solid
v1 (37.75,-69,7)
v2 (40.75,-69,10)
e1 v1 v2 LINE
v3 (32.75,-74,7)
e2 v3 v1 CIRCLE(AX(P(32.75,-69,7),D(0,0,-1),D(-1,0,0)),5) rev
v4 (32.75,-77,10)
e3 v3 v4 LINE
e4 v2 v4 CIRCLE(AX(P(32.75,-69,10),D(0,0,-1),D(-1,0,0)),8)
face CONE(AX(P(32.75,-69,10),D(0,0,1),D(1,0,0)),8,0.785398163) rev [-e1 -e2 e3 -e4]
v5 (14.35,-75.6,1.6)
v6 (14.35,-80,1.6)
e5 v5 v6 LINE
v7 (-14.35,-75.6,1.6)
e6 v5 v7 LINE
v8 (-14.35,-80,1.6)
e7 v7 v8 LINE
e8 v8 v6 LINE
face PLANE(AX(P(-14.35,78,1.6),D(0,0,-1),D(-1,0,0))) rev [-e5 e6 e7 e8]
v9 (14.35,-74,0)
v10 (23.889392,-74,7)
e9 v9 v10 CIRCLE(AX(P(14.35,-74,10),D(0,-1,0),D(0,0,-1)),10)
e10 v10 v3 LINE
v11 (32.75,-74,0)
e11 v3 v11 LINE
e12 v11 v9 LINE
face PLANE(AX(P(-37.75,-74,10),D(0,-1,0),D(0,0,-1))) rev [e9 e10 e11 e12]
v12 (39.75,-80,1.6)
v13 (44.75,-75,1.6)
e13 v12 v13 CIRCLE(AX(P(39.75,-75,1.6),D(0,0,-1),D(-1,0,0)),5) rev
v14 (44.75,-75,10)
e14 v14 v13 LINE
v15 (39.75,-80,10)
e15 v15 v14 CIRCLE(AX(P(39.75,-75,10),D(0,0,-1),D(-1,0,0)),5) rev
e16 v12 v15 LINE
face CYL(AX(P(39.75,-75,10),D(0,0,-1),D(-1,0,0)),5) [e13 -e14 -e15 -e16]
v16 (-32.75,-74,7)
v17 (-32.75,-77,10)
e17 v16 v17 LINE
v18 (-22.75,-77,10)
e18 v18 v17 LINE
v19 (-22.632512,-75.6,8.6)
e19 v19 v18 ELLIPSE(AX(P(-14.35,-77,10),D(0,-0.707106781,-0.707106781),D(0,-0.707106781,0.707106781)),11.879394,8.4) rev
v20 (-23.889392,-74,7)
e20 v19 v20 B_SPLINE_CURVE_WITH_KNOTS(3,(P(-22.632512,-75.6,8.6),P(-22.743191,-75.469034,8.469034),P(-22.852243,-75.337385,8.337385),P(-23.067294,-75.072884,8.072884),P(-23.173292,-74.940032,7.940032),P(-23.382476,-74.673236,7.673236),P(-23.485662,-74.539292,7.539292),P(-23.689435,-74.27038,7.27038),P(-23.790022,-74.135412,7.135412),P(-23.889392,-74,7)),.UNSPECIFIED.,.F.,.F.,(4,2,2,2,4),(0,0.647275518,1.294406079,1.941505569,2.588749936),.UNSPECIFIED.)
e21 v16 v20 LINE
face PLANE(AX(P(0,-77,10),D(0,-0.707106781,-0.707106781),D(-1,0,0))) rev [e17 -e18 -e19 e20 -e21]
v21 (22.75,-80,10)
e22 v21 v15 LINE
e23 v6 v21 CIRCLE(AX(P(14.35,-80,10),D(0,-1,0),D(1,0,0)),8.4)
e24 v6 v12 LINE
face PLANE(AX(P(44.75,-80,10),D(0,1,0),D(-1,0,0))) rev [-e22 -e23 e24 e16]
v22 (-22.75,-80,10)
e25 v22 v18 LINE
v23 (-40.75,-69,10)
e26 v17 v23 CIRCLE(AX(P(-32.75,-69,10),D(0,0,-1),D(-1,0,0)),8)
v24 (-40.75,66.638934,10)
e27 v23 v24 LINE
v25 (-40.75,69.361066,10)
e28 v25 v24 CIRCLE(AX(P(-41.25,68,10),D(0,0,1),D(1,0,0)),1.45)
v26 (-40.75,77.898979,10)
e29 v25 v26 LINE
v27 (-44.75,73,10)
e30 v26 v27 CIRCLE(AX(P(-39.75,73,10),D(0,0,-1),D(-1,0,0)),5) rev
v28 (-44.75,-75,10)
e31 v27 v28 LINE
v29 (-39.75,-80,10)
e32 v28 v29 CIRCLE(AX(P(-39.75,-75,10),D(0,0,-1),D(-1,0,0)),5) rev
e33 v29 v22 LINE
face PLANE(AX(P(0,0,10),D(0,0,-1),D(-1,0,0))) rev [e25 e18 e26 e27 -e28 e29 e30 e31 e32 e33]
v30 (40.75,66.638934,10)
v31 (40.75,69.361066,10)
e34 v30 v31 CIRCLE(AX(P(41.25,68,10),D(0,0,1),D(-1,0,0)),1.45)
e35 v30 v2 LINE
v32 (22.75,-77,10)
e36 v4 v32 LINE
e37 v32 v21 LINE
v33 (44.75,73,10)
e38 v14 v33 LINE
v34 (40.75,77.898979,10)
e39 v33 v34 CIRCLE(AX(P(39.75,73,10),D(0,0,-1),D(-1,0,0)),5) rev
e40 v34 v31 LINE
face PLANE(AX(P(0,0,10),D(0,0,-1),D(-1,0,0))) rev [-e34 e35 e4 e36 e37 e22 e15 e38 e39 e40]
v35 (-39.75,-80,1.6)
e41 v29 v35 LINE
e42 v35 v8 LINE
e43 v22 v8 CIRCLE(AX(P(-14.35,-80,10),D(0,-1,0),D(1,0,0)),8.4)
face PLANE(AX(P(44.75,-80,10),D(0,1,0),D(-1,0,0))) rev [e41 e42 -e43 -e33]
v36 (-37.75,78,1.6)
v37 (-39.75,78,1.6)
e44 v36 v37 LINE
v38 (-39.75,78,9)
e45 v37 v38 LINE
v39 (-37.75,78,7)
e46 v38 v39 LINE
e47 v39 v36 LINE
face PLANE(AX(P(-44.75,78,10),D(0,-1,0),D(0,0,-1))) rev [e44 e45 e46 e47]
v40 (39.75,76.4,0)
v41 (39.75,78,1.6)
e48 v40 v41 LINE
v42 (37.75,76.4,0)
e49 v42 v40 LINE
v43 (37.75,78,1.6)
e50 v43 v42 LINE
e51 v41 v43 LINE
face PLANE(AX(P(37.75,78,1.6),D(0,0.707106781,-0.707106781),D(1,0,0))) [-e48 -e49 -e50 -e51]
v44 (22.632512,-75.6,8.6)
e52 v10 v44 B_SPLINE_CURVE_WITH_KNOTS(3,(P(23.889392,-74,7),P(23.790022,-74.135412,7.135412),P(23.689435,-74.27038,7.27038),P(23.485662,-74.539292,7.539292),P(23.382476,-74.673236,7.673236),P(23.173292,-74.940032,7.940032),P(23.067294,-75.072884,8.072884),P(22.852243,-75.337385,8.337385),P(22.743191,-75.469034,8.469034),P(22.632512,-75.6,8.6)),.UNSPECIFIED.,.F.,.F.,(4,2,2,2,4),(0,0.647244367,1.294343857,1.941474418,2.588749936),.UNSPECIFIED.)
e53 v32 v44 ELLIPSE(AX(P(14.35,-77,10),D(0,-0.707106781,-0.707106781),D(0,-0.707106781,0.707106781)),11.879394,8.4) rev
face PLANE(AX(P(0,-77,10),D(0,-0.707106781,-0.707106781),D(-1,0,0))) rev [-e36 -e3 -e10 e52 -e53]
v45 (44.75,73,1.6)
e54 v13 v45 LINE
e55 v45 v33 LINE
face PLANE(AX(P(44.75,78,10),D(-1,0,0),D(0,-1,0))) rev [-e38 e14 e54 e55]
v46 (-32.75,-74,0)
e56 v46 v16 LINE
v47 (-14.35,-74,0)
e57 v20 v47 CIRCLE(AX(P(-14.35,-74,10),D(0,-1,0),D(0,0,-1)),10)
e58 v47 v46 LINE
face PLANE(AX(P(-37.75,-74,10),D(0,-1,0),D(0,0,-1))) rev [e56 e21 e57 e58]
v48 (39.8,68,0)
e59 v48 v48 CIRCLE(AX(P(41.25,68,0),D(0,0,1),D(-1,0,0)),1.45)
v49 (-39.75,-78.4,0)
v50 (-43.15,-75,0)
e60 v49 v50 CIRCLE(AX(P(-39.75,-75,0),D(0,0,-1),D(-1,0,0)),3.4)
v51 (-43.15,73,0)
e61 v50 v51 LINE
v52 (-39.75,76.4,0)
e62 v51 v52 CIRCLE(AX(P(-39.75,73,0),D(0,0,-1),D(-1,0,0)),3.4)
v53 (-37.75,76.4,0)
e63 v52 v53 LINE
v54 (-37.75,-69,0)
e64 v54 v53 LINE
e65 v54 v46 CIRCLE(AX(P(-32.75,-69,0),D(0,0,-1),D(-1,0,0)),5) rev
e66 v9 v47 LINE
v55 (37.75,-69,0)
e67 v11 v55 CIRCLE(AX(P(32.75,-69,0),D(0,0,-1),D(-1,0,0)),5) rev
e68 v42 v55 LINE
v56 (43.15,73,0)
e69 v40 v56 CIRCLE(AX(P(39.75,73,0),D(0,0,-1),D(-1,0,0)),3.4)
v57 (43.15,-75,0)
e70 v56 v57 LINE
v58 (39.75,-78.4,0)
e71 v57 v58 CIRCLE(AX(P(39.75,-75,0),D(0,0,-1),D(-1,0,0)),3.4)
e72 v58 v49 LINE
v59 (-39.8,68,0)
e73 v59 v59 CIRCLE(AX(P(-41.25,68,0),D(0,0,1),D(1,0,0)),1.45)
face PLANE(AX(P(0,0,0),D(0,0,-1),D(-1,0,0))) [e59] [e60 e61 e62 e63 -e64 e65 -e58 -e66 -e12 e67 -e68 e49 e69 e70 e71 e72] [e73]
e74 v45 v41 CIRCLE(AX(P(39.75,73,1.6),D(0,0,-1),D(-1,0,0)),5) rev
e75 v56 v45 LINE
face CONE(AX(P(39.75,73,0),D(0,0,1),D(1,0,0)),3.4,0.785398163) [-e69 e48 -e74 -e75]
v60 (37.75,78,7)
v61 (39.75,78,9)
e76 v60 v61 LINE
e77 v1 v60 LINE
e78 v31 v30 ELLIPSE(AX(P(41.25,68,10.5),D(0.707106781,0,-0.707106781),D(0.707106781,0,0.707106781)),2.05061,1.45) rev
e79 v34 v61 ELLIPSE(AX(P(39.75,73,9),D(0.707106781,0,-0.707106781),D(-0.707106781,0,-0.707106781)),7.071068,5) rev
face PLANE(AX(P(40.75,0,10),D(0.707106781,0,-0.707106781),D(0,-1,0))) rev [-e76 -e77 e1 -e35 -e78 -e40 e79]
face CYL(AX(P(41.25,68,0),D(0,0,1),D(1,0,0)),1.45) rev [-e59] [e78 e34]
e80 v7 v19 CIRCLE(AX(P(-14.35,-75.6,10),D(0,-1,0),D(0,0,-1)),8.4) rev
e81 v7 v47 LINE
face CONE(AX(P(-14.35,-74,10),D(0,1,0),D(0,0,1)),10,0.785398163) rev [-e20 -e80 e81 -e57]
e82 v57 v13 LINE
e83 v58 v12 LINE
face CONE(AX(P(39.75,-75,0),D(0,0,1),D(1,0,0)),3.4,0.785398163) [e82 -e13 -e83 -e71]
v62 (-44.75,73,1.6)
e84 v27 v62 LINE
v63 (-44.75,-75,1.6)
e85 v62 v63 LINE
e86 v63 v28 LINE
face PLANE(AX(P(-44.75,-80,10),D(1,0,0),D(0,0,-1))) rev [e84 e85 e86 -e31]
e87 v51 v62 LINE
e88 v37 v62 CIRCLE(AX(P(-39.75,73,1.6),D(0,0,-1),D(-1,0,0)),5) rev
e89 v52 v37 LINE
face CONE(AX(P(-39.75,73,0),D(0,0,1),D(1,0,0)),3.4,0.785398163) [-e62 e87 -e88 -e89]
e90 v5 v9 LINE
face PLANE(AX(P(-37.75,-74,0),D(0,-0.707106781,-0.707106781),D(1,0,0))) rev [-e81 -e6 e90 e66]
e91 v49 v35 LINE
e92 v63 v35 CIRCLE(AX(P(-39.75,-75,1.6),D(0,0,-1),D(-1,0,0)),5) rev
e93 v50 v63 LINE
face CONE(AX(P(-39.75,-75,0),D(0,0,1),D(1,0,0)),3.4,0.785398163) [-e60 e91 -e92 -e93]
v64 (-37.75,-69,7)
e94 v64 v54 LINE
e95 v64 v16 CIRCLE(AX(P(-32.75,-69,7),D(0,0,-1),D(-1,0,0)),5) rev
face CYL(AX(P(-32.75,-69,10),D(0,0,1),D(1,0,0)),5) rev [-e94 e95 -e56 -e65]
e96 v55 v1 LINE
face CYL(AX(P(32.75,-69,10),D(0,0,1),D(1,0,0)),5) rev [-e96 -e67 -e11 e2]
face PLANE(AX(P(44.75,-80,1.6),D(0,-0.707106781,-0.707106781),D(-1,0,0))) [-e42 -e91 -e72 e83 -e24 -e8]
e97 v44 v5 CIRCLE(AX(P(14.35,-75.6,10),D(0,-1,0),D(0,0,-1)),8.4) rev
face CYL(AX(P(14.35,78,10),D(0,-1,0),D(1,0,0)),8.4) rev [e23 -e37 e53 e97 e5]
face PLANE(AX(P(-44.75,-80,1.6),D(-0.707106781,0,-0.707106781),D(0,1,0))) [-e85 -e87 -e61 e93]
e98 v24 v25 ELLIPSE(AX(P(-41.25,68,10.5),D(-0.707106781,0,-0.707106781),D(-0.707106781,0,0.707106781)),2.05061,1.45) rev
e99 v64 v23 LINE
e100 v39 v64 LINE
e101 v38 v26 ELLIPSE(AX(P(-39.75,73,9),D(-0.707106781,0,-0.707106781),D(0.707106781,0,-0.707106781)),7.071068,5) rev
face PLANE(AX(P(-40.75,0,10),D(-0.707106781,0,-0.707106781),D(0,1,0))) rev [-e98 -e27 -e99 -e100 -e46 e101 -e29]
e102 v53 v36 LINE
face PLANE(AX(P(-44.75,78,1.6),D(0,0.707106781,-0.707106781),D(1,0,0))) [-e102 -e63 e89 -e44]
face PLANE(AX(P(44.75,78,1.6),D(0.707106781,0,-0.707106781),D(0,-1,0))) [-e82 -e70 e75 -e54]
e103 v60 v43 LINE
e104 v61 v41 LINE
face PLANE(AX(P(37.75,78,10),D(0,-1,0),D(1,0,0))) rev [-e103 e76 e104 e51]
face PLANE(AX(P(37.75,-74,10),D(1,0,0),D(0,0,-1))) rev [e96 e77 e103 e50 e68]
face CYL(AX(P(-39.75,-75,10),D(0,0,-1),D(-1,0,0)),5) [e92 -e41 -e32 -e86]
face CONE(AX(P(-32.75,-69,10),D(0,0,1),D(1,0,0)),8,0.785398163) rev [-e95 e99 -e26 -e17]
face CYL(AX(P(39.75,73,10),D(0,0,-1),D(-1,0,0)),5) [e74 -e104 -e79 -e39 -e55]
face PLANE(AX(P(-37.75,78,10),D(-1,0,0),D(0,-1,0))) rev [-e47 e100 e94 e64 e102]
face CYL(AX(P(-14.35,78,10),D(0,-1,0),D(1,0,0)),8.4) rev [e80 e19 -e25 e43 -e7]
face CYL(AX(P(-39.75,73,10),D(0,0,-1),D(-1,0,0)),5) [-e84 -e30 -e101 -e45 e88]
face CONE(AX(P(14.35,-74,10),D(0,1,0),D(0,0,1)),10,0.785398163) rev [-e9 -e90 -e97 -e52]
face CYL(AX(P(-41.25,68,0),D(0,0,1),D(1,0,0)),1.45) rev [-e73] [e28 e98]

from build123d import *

# Parameters (mm, degrees)
BOSS_EXTRUDE1_DEPTH = 10
SKETCH4_R           = 1.45
CUT_EXTRUDE2_DEPTH  = 93.209340633
FILLET3_R           = 5
CHAMFER1_SIZE       = 3
FILLET1_R           = 5
FILLET2_R           = 5
CHAMFER2_SIZE       = 1.6
CUT_EXTRUDE1_DEPTH  = 165.519185811
CHAMFER3_SIZE       = 1.6


# Some blends are built 0.0001 mm under size
with BuildPart() as part:
    # Sketch2 → Boss-Extrude1 (new body)
    with BuildSketch(Plane.XY):
        Polygon((-44.75, 78), (-37.75, 78), (-37.75, -74), (37.75, -74), (37.75, 78), (44.75, 78), (44.75, -80), (-44.75, -80), align=None)
    extrude(amount=BOSS_EXTRUDE1_DEPTH)

    # Sketch4 → Cut-Extrude2 (cut, through all)
    with BuildSketch(Plane.XY.offset(10)):
        with Locations((-41.25, 68)):
            Circle(SKETCH4_R)
        with Locations(Location((41.25, 68, 0), (0, 0, 180))):
            Circle(SKETCH4_R)
    extrude(amount=-CUT_EXTRUDE2_DEPTH, mode=Mode.SUBTRACT)

    # Fillet3
    fillet3_edges = [part.edges().sort_by_distance(p)[0] for p in [
        (-37.75, -74, 5),
        (37.75, -74, 5),
    ]]
    fillet(fillet3_edges, radius=FILLET3_R)

    # Chamfer1
    # the kernel refuses this chamfer: 3 mm, written as the material it takes off along each edge
    with BuildSketch(Plane(origin=(37.75, -69, 10), x_dir=(0.9996219169112968, 0, 0.02749587661058619), z_dir=(0, 1, 0))) as chamfer1_piece_1:
        Polygon((CHAMFER1_SIZE * 0.999621916911, CHAMFER1_SIZE * 0.0274958766106), (-CHAMFER1_SIZE * 0.0274958766106, CHAMFER1_SIZE * 0.999621916911), (0, 0), align=None)
    extrude(amount=154.715048964, mode=Mode.SUBTRACT)
    with BuildSketch(Plane(origin=(-32.75, -74, 10), x_dir=(0, -0.9996219169112968, 0.02749587661058619), z_dir=(1, 0, 0))) as chamfer1_piece_2:
        Polygon((CHAMFER1_SIZE * 0.999621916911, CHAMFER1_SIZE * 0.0274958766106), (-CHAMFER1_SIZE * 0.0274958766106, CHAMFER1_SIZE * 0.999621916911), (0, 0), align=None)
    extrude(amount=65.5, mode=Mode.SUBTRACT)
    with BuildSketch(Plane(origin=(-37.75, 85.715048964, 10), x_dir=(0.027495876610586775, 0, -0.9996219169112968), z_dir=(0, -1, 0))) as chamfer1_piece_3:
        Polygon((CHAMFER1_SIZE * 0.999621916911, -CHAMFER1_SIZE * 0.0274958766106), (-CHAMFER1_SIZE * 0.0274958766106, -CHAMFER1_SIZE * 0.999621916911), (0, 0), align=None)
    extrude(amount=154.715048964, mode=Mode.SUBTRACT)
    with BuildSketch(Plane(origin=(32.75, -69, 10), x_dir=(0, -1, 0), z_dir=(-1, 0, 0))) as chamfer1_piece_4:
        Polygon((5 + CHAMFER1_SIZE, 0), (5, -CHAMFER1_SIZE), (5, 0), align=None)
    revolve(axis=Axis((32.75, -69, 10), (0, 0, 1)), revolution_arc=90, mode=Mode.SUBTRACT)
    with BuildSketch(Plane(origin=(-32.75, -69, 10), x_dir=(-1, 0, 0), z_dir=(0, 1, 0))) as chamfer1_piece_5:
        Polygon((5, -CHAMFER1_SIZE), (5 + CHAMFER1_SIZE, 0), (5, 0), align=None)
    revolve(axis=Axis((-32.75, -69, 10), (0, 0, 1)), revolution_arc=90, mode=Mode.SUBTRACT)

    # Fillet1
    fillet1_edges = [part.edges().sort_by_distance(p)[0] for p in [
        (44.75, 78, 5),
        (-44.75, 78, 5),
    ]]
    fillet(fillet1_edges, radius=FILLET1_R)

    # Fillet2
    fillet2_edges = [part.edges().sort_by_distance(p)[0] for p in [
        (44.75, -80, 5),
        (-44.75, -80, 5),
    ]]
    fillet(fillet2_edges, radius=FILLET2_R)

    # Chamfer2
    chamfer2_edges = [part.edges().sort_by_distance(p)[0] for p in [
        (38.75, 78, 0),
        (-44.75, -1, 0),
        (-43.285533906, 76.535533906, 0),
        (43.285533906, 76.535533906, 0),
        (-38.75, 78, 0),
        (44.75, -1, 0),
        (0, -80, 0),
        (-43.285533906, -78.535533906, 0),
        (43.285533906, -78.535533906, 0),
    ]]
    chamfer(chamfer2_edges, length=CHAMFER2_SIZE)

    # Sketch3 → Cut-Extrude1 (cut, through all)
    with BuildSketch(Plane.XZ.offset(80)):
        with BuildLine():
            Line((-14.35, 18.4), (14.35, 18.4))
            ThreePointArc((14.35, 18.4), (22.75, 10), (14.35, 1.6))
            Line((14.35, 1.6), (-14.35, 1.6))
            ThreePointArc((-14.35, 1.6), (-22.75, 10), (-14.35, 18.4))
        make_face()
    extrude(amount=-CUT_EXTRUDE1_DEPTH, mode=Mode.SUBTRACT)

    # Chamfer3
    chamfer3_edges = [part.edges().sort_by_distance(p)[0] for p in [
        (-19.11235236, -74, 3.080462443),
        (19.11235236, -74, 3.080462443),
        (0, -74, 1.6),
    ]]
    chamfer(chamfer3_edges, length=CHAMFER3_SIZE - 0.0001)  # a hair under: the kernel refuses the full size


solid = part.part
